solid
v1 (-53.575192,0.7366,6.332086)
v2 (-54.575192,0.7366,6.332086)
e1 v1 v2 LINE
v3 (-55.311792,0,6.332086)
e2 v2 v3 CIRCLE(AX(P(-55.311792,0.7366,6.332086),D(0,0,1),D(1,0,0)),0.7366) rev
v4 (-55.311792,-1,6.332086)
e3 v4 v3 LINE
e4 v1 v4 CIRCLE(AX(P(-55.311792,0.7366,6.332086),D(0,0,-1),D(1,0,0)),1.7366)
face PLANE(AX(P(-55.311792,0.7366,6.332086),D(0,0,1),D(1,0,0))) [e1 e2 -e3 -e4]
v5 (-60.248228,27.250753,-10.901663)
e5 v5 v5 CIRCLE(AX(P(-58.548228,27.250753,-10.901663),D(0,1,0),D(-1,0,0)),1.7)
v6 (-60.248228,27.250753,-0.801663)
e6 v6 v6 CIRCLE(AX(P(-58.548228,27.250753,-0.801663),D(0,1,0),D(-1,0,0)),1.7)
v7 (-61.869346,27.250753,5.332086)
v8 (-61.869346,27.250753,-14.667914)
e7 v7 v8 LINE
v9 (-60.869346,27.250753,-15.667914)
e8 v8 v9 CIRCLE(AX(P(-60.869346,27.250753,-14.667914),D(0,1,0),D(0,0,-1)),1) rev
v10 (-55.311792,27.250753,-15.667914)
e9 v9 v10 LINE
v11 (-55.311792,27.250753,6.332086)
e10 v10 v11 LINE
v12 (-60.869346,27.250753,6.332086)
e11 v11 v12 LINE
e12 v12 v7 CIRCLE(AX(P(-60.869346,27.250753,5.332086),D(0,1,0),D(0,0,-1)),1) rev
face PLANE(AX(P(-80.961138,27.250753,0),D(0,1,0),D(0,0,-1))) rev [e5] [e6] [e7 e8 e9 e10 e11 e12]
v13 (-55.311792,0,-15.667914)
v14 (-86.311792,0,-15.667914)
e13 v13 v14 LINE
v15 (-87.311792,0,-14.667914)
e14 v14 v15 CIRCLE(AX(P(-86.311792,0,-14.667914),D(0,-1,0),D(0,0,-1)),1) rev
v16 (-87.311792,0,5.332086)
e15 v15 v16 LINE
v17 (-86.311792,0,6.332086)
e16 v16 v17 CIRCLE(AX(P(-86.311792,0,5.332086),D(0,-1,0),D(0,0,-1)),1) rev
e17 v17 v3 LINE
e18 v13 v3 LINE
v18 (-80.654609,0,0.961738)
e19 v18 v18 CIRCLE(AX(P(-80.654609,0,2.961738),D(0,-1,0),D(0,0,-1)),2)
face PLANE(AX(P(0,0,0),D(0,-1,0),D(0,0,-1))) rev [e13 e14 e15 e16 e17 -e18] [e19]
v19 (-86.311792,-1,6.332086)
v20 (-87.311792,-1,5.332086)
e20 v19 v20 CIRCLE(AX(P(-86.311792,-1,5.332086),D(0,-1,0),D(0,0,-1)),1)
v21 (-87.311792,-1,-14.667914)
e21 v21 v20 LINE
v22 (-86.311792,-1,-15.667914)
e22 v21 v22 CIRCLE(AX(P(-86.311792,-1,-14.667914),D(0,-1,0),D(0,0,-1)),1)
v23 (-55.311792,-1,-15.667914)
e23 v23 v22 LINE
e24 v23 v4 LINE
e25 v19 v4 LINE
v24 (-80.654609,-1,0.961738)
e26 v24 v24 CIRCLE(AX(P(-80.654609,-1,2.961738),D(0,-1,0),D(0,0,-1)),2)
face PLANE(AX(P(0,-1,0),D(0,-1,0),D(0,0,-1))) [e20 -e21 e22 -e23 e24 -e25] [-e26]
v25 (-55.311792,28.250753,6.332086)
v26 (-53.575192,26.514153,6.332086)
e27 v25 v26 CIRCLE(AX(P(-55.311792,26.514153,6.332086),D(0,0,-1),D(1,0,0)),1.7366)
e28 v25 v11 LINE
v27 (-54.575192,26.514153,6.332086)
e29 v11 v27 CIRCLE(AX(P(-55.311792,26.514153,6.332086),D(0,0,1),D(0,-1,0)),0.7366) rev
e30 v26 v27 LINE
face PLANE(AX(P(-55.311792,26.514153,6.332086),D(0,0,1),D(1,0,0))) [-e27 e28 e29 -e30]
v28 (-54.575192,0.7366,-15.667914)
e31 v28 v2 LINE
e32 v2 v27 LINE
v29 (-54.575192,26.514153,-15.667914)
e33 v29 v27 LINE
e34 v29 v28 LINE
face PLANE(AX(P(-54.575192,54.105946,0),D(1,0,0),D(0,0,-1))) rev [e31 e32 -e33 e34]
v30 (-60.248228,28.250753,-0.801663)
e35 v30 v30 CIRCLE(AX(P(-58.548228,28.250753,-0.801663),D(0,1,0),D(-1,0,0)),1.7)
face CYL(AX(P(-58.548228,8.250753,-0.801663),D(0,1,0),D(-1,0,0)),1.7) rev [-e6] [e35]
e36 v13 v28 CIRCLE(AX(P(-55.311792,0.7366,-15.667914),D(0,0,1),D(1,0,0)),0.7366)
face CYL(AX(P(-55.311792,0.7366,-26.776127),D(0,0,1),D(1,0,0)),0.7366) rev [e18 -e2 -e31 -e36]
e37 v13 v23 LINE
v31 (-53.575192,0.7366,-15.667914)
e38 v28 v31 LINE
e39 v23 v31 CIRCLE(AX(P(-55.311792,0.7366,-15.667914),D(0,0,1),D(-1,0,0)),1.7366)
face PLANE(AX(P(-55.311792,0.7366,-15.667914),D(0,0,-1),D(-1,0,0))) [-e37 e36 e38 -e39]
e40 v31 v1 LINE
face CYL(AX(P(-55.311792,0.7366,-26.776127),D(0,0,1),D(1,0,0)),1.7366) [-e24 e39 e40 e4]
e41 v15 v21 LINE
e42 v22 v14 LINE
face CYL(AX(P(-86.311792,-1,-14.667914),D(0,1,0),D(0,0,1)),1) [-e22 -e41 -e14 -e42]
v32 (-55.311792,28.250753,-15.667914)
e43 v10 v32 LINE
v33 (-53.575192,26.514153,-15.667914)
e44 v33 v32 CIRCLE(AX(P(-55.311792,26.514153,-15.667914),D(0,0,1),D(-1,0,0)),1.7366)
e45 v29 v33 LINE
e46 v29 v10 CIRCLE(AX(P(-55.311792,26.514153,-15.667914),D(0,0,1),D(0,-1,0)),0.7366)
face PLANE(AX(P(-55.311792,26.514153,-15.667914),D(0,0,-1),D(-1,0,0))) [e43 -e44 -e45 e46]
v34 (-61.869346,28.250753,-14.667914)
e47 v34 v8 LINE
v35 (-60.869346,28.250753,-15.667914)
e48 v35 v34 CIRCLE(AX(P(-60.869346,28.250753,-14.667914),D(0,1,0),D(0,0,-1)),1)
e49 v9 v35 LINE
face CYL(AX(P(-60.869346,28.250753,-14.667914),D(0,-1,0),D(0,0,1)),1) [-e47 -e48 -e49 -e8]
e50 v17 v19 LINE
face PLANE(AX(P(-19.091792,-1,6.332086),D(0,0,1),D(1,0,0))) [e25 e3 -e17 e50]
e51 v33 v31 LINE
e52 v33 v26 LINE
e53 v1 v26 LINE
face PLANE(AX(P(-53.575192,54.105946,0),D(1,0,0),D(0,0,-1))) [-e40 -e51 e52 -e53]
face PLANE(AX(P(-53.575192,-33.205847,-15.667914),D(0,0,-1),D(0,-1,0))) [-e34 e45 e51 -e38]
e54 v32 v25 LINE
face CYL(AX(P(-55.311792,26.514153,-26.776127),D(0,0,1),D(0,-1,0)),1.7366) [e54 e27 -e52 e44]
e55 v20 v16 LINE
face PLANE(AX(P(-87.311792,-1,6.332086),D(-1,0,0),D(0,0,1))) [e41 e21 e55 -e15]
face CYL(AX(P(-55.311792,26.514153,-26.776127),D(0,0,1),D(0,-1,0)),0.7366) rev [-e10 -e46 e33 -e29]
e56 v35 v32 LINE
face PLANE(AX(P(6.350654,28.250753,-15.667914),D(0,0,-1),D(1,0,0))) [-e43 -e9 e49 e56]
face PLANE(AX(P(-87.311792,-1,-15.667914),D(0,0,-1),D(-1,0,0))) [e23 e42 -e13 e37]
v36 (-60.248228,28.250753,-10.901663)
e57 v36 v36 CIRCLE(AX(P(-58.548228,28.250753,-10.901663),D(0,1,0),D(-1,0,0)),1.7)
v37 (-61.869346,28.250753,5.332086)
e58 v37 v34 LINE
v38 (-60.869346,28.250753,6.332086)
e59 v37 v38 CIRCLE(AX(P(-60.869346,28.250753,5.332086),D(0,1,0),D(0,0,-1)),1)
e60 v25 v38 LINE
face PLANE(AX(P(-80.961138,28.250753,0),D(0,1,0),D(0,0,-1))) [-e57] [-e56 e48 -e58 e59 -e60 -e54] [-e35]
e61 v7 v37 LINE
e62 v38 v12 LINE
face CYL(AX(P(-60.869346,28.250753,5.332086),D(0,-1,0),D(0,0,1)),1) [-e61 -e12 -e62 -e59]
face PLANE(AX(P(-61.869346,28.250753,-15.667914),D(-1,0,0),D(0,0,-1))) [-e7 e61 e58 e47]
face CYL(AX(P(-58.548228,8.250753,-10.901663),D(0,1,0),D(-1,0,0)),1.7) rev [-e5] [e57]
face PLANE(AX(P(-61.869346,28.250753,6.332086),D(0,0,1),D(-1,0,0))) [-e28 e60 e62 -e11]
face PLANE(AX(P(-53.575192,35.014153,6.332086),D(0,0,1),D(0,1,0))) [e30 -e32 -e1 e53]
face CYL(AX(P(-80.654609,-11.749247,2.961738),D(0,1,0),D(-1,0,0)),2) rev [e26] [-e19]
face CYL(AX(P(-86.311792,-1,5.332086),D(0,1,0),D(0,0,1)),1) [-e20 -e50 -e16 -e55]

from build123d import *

# Parameters (mm, degrees)
SKETCH_1_W             = 68.22
SKETCH_1_H             = 22
SM_BASE_FLANGE_1_DEPTH = 1
FILLET_1_R             = 1
OTHER_START            = -15.667913645
OTHER_1_DEPTH          = 22
OTHER_1_2_DEPTH        = 22
OTHER_START_2          = 27.250753262
OTHER_1_3_DEPTH        = 1.749246738
SKETCH_7_R             = 2
CUT_EXTRUDE_1_DEPTH    = 40
SKETCH_7_6_R           = 1.7
CUT_EXTRUDE_4_DEPTH    = 20


with BuildPart() as part:
    # 基体-法兰1: sheet metal written as solids
    # Sketch 1 → 基体-法兰1 (new body)
    with BuildSketch(Plane(origin=(0, 0, 0), x_dir=(1, 0, 0), z_dir=(0, 1, 0))):
        with Locations((-53.201792275, 4.667913645)):
            Rectangle(SKETCH_1_W, SKETCH_1_H)
    extrude(amount=-SM_BASE_FLANGE_1_DEPTH)

    # 圆角1
    fillet_1_edges = [part.edges().sort_by_distance(p)[0] for p in [
        (-87.311792275, -0.5, -15.667913645),
        (-19.091792275, -0.5, -15.667913645),
        (-19.091792275, -0.5, 6.332086355),
        (-87.311792275, -0.5, 6.332086355),
    ]]
    fillet(fillet_1_edges, radius=FILLET_1_R)

    # Other 1: read off the stored shape, not the designer's step
    # Other 1 outline → Other 1 (cut)
    with BuildSketch(Plane.XY.offset(OTHER_START)):
        with BuildLine():
            Line((-19.091792275, 0), (-53.739151185, 0))
            ThreePointArc((-53.739151185, 0), (-54.379966111, -0.728828115), (-55.311792275, -1))
            Line((-55.311792275, -1), (-19.091792275, -1))
            Line((-19.091792275, -1), (-19.091792275, 0))
        make_face()
    extrude(amount=OTHER_1_DEPTH, mode=Mode.SUBTRACT)

    # Other 1 2 outline → Other 1 2 (add)
    with BuildSketch(Plane.XY.offset(OTHER_START)):
        with BuildLine():
            ThreePointArc((-53.739151185, 0), (-53.616677518, 0.359286442), (-53.575192275, 0.7366))
            Line((-53.575192275, 0.7366), (-53.575192275, 26.514153262))
            ThreePointArc((-53.575192275, 26.514153262), (-54.083830639, 27.742114898), (-55.311792275, 28.250753262))
            Line((-55.311792275, 28.250753262), (-61.869345538, 28.250753262))
            Line((-61.869345538, 28.250753262), (-61.869345538, 27.250753262))
            Line((-61.869345538, 27.250753262), (-55.311792275, 27.250753262))
            ThreePointArc((-55.311792275, 27.250753262), (-54.79093742, 27.035008117), (-54.575192275, 26.514153262))
            Line((-54.575192275, 26.514153262), (-54.575192275, 0.7366))
            ThreePointArc((-54.575192275, 0.7366), (-54.79093742, 0.215745145), (-55.311792275, 0))
            Line((-55.311792275, 0), (-53.739151185, 0))
        make_face()
    extrude(amount=OTHER_1_2_DEPTH)

    # Other 1 3 outline → Other 1 3 (cut)
    with BuildSketch(Plane(origin=(0, 0, 0), x_dir=(1, 0, 0), z_dir=(0, 1, 0)).offset(OTHER_START_2)):
        with BuildLine():
            Line((-61.869345538, -6.332086355), (-60.869345538, -6.332086355))
            ThreePointArc((-60.869345538, -6.332086355), (-61.576452319, -6.039193136), (-61.869345538, -5.332086355))
            Line((-61.869345538, -5.332086355), (-61.869345538, -6.332086355))
        make_face()
        with BuildLine():
            Line((-61.869345538, 15.667913645), (-61.869345538, 14.667913645))
            ThreePointArc((-61.869345538, 14.667913645), (-61.576452319, 15.375020426), (-60.869345538, 15.667913645))
            Line((-60.869345538, 15.667913645), (-61.869345538, 15.667913645))
        make_face()
    extrude(amount=OTHER_1_3_DEPTH, mode=Mode.SUBTRACT)

    # 草图7 → 切除-拉伸1 (cut)
    with BuildSketch(Plane(origin=(0, 28.250753262, 0), x_dir=(1, 0, 0), z_dir=(0, 1, 0))):
        with Locations(Location((-80.654608631, -2.961737693, 0), (0, 0, 90))):
            Circle(SKETCH_7_R)
    extrude(amount=-CUT_EXTRUDE_1_DEPTH, mode=Mode.SUBTRACT)

    # 草图7<6> → 切除-拉伸4 (cut)
    with BuildSketch(Plane(origin=(0, 28.250753262, 0), x_dir=(1, 0, 0), z_dir=(0, 1, 0))):
        with Locations(Location((-58.548227621, 10.901663137, 0), (0, 0, 180))):
            Circle(SKETCH_7_6_R)
        with Locations(Location((-58.548227621, 0.801663137, 0), (0, 0, 180))):
            Circle(SKETCH_7_6_R)
    extrude(amount=-CUT_EXTRUDE_4_DEPTH, mode=Mode.SUBTRACT)


solid = part.part
